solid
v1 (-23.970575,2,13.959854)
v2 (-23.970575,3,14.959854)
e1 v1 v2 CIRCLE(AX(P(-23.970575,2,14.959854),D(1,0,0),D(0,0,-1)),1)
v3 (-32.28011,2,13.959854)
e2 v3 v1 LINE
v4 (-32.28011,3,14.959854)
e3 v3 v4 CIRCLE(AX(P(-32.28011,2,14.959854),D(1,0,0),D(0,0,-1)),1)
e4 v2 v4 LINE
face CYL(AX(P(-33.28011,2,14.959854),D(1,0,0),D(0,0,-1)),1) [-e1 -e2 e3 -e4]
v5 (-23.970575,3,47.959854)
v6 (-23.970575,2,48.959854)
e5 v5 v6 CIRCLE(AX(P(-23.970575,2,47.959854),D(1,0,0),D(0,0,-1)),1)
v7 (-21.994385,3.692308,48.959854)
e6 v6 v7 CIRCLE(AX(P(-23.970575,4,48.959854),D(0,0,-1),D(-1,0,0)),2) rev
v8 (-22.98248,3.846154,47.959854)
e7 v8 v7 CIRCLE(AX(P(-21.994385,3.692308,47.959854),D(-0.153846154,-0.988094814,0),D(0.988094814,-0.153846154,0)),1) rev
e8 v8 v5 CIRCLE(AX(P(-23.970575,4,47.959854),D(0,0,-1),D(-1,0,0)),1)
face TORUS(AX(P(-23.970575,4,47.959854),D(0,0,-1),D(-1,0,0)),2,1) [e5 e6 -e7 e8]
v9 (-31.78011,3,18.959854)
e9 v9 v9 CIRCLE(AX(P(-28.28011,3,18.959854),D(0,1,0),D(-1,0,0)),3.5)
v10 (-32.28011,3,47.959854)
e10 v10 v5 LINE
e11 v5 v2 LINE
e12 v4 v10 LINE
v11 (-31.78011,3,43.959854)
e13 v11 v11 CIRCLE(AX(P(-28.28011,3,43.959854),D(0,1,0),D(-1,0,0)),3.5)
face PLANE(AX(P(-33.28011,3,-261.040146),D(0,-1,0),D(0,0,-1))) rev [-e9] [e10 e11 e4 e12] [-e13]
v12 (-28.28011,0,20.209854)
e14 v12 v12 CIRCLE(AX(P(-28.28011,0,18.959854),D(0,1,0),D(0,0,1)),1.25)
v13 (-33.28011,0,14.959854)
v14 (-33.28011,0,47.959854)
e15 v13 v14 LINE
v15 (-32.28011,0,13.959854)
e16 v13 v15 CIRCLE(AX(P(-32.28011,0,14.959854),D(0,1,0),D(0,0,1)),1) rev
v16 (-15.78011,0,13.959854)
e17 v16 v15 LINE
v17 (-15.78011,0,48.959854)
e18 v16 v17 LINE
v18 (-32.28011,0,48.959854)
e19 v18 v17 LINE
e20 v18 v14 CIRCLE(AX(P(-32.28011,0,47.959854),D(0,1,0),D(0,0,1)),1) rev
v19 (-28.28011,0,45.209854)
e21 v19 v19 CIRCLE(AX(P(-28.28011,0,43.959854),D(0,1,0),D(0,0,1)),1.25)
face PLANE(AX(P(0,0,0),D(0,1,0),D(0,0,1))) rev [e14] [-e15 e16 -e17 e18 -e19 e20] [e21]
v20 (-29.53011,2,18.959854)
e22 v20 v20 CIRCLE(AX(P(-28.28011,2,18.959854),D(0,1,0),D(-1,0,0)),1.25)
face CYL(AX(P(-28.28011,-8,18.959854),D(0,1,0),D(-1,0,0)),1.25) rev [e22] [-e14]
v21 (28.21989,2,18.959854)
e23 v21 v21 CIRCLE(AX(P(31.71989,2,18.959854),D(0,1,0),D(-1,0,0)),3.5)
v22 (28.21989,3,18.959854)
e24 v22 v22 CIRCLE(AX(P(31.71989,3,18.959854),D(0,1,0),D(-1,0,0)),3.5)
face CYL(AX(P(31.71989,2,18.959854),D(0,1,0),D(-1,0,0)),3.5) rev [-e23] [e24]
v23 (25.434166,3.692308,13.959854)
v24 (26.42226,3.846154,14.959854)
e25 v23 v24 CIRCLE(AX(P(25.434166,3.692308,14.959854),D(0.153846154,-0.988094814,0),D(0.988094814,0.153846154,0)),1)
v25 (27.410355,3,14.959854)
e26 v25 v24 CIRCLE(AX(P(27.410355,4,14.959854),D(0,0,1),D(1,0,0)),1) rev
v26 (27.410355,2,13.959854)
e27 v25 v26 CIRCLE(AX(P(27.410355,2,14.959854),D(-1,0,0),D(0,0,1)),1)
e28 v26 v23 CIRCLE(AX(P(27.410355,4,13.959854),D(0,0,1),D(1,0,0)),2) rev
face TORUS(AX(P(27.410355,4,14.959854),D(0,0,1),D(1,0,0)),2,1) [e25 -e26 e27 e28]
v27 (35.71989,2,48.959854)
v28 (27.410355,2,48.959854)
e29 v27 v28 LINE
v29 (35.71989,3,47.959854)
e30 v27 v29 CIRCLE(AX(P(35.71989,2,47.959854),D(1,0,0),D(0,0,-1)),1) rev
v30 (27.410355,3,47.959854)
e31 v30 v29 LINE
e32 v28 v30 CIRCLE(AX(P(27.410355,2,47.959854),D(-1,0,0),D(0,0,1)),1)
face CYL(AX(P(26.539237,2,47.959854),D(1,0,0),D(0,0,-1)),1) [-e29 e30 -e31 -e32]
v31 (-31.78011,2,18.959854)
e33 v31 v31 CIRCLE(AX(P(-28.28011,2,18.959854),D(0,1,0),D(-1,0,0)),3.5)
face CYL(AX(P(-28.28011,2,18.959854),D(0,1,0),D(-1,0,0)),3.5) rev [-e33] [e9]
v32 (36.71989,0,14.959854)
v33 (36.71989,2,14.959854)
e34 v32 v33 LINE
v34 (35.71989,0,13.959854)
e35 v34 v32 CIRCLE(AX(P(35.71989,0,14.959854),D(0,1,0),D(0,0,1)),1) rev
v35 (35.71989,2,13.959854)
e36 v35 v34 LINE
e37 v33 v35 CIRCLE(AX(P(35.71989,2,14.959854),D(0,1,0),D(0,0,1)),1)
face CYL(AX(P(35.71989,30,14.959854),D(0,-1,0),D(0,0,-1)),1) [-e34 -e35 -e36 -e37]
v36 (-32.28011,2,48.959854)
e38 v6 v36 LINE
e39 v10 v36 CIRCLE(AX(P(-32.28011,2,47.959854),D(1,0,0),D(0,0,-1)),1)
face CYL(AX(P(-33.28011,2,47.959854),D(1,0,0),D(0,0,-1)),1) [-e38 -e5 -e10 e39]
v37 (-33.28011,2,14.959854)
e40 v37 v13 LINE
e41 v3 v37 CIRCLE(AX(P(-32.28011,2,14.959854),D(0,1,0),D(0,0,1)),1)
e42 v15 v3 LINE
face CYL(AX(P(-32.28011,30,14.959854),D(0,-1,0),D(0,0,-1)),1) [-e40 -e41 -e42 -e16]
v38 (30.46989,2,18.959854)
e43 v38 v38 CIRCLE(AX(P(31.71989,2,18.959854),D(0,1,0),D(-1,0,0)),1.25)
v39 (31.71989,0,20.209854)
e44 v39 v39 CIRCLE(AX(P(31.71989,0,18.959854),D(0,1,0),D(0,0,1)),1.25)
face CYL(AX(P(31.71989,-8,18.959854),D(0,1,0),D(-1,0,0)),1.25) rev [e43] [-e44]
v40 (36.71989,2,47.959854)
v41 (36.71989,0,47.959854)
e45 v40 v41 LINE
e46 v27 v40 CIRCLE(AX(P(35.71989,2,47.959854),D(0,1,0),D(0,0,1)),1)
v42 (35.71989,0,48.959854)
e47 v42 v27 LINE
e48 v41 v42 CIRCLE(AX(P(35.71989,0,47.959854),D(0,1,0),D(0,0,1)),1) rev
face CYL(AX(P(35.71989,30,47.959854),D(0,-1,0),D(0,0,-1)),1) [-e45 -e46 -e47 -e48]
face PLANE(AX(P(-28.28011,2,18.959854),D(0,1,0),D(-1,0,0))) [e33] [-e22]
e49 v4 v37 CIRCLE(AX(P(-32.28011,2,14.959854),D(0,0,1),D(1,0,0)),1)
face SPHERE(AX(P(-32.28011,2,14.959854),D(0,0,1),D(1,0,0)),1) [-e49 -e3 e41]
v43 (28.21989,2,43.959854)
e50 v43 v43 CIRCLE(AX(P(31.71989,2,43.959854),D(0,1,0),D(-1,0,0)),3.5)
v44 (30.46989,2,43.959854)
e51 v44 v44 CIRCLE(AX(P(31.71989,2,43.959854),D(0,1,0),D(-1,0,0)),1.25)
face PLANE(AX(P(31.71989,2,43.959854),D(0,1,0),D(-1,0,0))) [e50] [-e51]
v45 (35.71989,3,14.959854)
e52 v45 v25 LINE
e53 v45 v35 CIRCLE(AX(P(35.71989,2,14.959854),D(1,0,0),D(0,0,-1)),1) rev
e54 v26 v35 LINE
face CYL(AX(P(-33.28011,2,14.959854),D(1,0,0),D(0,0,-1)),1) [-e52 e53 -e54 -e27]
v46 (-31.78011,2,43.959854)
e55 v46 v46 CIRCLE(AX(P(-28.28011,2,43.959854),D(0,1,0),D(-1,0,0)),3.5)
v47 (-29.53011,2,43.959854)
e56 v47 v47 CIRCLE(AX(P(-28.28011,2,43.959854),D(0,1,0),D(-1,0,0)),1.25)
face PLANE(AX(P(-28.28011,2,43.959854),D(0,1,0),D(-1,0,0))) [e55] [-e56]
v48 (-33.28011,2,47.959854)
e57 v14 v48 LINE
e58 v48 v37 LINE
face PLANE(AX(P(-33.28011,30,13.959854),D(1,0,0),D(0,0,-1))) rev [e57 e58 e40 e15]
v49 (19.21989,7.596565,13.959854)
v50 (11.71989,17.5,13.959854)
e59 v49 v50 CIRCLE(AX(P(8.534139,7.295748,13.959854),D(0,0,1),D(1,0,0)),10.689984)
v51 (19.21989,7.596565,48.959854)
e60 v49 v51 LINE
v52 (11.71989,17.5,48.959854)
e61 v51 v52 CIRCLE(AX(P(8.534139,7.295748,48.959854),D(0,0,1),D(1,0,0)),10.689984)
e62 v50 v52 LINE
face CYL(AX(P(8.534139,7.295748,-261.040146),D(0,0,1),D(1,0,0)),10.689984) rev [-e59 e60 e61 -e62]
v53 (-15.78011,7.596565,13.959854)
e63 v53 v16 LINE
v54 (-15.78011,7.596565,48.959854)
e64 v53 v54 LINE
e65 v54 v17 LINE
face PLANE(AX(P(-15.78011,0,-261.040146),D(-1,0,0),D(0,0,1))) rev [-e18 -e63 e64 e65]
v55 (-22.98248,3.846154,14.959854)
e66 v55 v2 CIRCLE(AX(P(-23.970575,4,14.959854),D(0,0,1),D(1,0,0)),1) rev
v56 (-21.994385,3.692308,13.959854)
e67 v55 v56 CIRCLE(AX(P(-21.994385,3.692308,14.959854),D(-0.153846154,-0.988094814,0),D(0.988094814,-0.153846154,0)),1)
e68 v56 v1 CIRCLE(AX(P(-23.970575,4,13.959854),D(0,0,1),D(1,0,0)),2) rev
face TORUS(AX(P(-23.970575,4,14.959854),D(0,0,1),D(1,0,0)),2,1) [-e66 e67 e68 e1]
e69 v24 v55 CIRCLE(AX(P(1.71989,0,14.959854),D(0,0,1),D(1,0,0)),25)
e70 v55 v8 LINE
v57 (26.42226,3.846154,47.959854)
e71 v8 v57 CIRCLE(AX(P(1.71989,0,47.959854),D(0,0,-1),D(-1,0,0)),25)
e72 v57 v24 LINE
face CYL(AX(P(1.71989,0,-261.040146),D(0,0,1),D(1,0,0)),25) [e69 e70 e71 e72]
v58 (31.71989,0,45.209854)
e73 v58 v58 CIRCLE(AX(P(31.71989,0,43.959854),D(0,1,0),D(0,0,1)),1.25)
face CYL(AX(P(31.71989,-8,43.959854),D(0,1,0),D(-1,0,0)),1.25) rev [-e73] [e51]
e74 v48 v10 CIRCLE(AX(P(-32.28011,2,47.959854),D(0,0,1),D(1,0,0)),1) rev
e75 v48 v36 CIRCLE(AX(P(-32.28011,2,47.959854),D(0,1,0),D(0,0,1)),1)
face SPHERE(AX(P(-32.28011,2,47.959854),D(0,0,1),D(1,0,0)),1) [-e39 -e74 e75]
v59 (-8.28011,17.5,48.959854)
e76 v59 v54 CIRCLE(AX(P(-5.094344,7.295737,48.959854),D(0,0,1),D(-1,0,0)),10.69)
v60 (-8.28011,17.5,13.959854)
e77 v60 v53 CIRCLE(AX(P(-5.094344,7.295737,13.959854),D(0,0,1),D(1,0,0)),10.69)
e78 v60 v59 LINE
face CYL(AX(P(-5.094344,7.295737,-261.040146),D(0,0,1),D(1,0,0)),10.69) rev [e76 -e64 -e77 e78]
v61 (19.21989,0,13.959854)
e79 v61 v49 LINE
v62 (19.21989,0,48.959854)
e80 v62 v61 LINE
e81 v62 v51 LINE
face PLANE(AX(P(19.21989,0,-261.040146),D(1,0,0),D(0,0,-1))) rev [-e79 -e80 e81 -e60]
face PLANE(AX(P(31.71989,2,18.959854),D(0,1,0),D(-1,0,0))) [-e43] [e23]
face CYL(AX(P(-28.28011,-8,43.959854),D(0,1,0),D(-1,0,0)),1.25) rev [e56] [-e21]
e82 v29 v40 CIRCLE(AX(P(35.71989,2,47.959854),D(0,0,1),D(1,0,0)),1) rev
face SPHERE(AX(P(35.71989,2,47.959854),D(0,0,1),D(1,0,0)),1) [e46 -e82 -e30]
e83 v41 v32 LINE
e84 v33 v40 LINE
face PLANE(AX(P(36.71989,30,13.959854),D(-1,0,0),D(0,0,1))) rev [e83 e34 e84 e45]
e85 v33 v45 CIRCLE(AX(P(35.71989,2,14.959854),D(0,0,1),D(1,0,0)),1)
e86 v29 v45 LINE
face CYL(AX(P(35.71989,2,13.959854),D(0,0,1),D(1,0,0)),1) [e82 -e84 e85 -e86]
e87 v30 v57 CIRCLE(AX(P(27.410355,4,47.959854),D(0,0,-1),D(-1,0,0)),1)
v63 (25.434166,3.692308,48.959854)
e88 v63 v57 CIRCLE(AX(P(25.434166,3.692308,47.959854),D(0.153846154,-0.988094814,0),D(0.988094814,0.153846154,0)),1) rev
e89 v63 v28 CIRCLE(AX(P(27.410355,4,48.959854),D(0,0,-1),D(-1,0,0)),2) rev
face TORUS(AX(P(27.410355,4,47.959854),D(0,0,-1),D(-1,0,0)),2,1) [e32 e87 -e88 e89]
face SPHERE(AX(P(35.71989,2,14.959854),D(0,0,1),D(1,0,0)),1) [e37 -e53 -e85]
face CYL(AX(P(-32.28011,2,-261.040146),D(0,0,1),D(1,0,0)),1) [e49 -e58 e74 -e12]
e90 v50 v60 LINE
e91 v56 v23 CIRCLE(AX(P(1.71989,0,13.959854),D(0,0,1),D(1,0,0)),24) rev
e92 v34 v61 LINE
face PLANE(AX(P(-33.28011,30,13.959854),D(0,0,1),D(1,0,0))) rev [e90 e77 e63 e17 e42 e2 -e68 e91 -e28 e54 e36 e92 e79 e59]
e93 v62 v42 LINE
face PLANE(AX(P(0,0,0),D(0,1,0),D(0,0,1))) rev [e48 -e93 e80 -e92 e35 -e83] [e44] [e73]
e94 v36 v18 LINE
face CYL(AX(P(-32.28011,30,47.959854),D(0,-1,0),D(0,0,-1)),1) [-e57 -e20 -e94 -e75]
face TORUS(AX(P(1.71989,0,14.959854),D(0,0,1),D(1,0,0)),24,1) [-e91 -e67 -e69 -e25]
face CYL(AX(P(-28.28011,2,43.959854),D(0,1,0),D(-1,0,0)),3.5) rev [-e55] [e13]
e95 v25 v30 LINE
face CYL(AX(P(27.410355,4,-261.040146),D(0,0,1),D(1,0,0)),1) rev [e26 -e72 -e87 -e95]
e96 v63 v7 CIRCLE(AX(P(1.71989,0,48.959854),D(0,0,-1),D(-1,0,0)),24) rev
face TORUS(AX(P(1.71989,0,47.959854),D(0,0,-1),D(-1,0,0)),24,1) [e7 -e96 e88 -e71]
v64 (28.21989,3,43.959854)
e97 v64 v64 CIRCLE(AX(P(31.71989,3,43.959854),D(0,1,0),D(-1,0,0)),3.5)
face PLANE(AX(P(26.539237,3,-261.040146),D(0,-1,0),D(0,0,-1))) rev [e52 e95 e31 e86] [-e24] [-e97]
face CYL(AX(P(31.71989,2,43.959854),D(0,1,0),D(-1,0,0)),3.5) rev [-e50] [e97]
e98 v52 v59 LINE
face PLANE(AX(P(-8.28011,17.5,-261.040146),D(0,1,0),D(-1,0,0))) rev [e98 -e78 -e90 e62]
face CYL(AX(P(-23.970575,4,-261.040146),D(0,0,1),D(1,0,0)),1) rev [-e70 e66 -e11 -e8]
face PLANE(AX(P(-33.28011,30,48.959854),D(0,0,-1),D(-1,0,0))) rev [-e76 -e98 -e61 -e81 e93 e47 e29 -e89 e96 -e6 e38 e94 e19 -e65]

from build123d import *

# Parameters (mm, degrees)
CROQUIS1_W              = 70
CROQUIS1_H              = 35
SALIENTE_EXTRUIR1_DEPTH = 30
CORTAR_EXTRUIR1_DEPTH   = 310
CORTAR_EXTRUIR2_DEPTH   = 310
CROQUIS4_R              = 3.5
CORTAR_EXTRUIR3_DEPTH   = 1
REDONDEO1_R             = 1
REDONDEO2_R             = 1
CROQUIS5_R              = 1.25
CORTAR_EXTRUIR4_DEPTH   = 10


with BuildPart() as part:
    # Croquis1 → Saliente-Extruir1 (new body)
    with BuildSketch(Plane(origin=(0, 0, 0), x_dir=(1, 0, 0), z_dir=(0, 1, 0))):
        with Locations((1.719890136, -31.459853515)):
            Rectangle(CROQUIS1_W, CROQUIS1_H)
    extrude(amount=SALIENTE_EXTRUIR1_DEPTH)

    # Croquis2 → Cortar-Extruir1 (cut)
    with BuildSketch(Plane.XY.offset(48.959853515)):
        with BuildLine():
            Line((-15.780109864, 0), (-15.780109864, 7.596564782))
            ThreePointArc((-15.780109864, 7.596564782), (-13.616336365, 13.749552304), (-8.280109864, 17.5))
            Line((-8.280109864, 17.5), (11.719890136, 17.5))
            ThreePointArc((11.719890136, 17.5), (17.0561195, 13.749554472), (19.219890136, 7.596564782))
            Line((19.219890136, 7.596564782), (19.219890136, 0))
            ThreePointArc((19.219890136, 0), (1.719890136, -17.5), (-15.780109864, 0))
        make_face()
    extrude(amount=-CORTAR_EXTRUIR1_DEPTH, mode=Mode.SUBTRACT)

    # Croquis3 → Cortar-Extruir2 (cut)
    with BuildSketch(Plane.XY.offset(48.959853515)):
        with BuildLine():
            Line((-33.280109864, 30), (36.719890136, 30))
            Line((36.719890136, 30), (36.719890136, 3))
            Line((36.719890136, 3), (26.539237428, 3))
            ThreePointArc((26.539237428, 3), (1.719890136, 25), (-23.099457156, 3))
            Line((-23.099457156, 3), (-33.280109864, 3))
            Line((-33.280109864, 3), (-33.280109864, 30))
        make_face()
    extrude(amount=-CORTAR_EXTRUIR2_DEPTH, mode=Mode.SUBTRACT)

    # Croquis4 → Cortar-Extruir3 (cut)
    with BuildSketch(Plane(origin=(0, 3, 0), x_dir=(1, 0, 0), z_dir=(0, 1, 0))):
        with Locations(Location((-28.280109864, -18.959853515, 0), (0, 0, 180))):
            Circle(CROQUIS4_R)
        with Locations(Location((-28.280109864, -43.959853515, 0), (0, 0, 180))):
            Circle(CROQUIS4_R)
        with Locations(Location((31.719890136, -18.959853515, 0), (0, 0, 180))):
            Circle(CROQUIS4_R)
        with Locations(Location((31.719890136, -43.959853515, 0), (0, 0, 180))):
            Circle(CROQUIS4_R)
    extrude(amount=-CORTAR_EXTRUIR3_DEPTH, mode=Mode.SUBTRACT)

    # Redondeo1
    redondeo1_edges = [part.edges().sort_by_distance(p)[0] for p in [
        (-28.18978351, 3, 13.959853515),
        (1.719890136, 25, 13.959853515),
        (31.629563782, 3, 13.959853515),
        (36.719890136, 3, 31.459853515),
        (26.539237428, 3, 31.459853515),
        (-23.099457156, 3, 31.459853515),
        (-33.280109864, 3, 31.459853515),
        (-28.18978351, 3, 48.959853515),
        (1.719890136, 25, 48.959853515),
        (31.629563782, 3, 48.959853515),
    ]]
    fillet(redondeo1_edges, radius=REDONDEO1_R)

    # Redondeo2
    # the kernel refuses this fillet: 1 mm, written as the material it takes off along each edge
    with BuildSketch(Plane(origin=(-32.280109864, 2, 14.959853515), x_dir=(-1, 0, 0), z_dir=(0, 0, -1))) as redondeo2_piece_1_section:
        Polygon((0, 0), (REDONDEO2_R, 0), (REDONDEO2_R, REDONDEO2_R), (0, REDONDEO2_R), align=None)
    redondeo2_piece_1 = extrude(amount=REDONDEO2_R, mode=Mode.PRIVATE)
    redondeo2_piece_1 = redondeo2_piece_1 - Plane(origin=(-32.280109864, 2, 14.959853515), x_dir=(0.7071067811865475, -0.7071067811865475, 0), z_dir=(0, 0, -1)) * Sphere(REDONDEO2_R, mode=Mode.PRIVATE)
    add(redondeo2_piece_1, mode=Mode.SUBTRACT)
    with BuildSketch(Plane(origin=(35.719890136, 2, 14.959853515), x_dir=(1, 0, 0), z_dir=(0, 0, -1))) as redondeo2_piece_2_section:
        Polygon((0, 0), (REDONDEO2_R, 0), (REDONDEO2_R, -REDONDEO2_R), (0, -REDONDEO2_R), align=None)
    redondeo2_piece_2 = extrude(amount=REDONDEO2_R, mode=Mode.PRIVATE)
    redondeo2_piece_2 = redondeo2_piece_2 - Plane(origin=(35.719890136, 2, 14.959853515), x_dir=(-0.7071067811865475, -0.7071067811865475, 0), z_dir=(0, 0, -1)) * Sphere(REDONDEO2_R, mode=Mode.PRIVATE)
    add(redondeo2_piece_2, mode=Mode.SUBTRACT)
    with BuildSketch(Plane(origin=(-32.280109864, 2, 47.959853515), x_dir=(0, 0, 1), z_dir=(-1, 0, 0))) as redondeo2_piece_3_section:
        Polygon((0, 0), (REDONDEO2_R, 0), (REDONDEO2_R, REDONDEO2_R), (0, REDONDEO2_R), align=None)
    redondeo2_piece_3 = extrude(amount=REDONDEO2_R, mode=Mode.PRIVATE)
    redondeo2_piece_3 = redondeo2_piece_3 - Plane(origin=(-32.280109864, 2, 47.959853515), x_dir=(0, -0.7071067811865475, -0.7071067811865475), z_dir=(-1, 0, 0)) * Sphere(REDONDEO2_R, mode=Mode.PRIVATE)
    add(redondeo2_piece_3, mode=Mode.SUBTRACT)
    with BuildSketch(Plane(origin=(35.719890136, 2, 47.959853515), x_dir=(0, 0, 1), z_dir=(1, 0, 0))) as redondeo2_piece_4_section:
        Polygon((0, 0), (REDONDEO2_R, 0), (REDONDEO2_R, -REDONDEO2_R), (0, -REDONDEO2_R), align=None)
    redondeo2_piece_4 = extrude(amount=REDONDEO2_R, mode=Mode.PRIVATE)
    redondeo2_piece_4 = redondeo2_piece_4 - Plane(origin=(35.719890136, 2, 47.959853515), x_dir=(0, -0.7071067811865475, -0.7071067811865475), z_dir=(1, 0, 0)) * Sphere(REDONDEO2_R, mode=Mode.PRIVATE)
    add(redondeo2_piece_4, mode=Mode.SUBTRACT)
    with BuildSketch(Plane(origin=(36.719890136, -2.5, 48.959853515), x_dir=(0, 0, -1), z_dir=(0, 1, 0)), Plane(origin=(36.719890136, -2.5, 13.959853515), x_dir=(-1, 0, 0), z_dir=(0, 1, 0))) as redondeo2_piece_5:
        with BuildLine():
            CenterArc((REDONDEO2_R, REDONDEO2_R), REDONDEO2_R, 180, 90)
            Line((0, REDONDEO2_R), (0, 0))
            Line((0, 0), (REDONDEO2_R, 0))
        make_face()
    extrude(amount=4.5, mode=Mode.SUBTRACT)
    with BuildSketch(Plane(origin=(-33.280109864, -2.5, 48.959853515), x_dir=(0, 0, -1), z_dir=(0, 1, 0)), Plane(origin=(-33.280109864, -2.5, 13.959853515), x_dir=(1, 0, 0), z_dir=(0, 1, 0))) as redondeo2_piece_6:
        with BuildLine():
            CenterArc((REDONDEO2_R, -REDONDEO2_R), REDONDEO2_R, 90, 90)
            Line((0, -REDONDEO2_R), (0, 0))
            Line((0, 0), (REDONDEO2_R, 0))
        make_face()
    extrude(amount=4.5, mode=Mode.SUBTRACT)

    # Croquis5 → Cortar-Extruir4 (cut)
    with BuildSketch(Plane(origin=(0, 2, 0), x_dir=(1, 0, 0), z_dir=(0, 1, 0))):
        with Locations(Location((-28.280109864, -18.959853515, 0), (0, 0, 180))):
            Circle(CROQUIS5_R)
        with Locations(Location((31.719890136, -18.959853515, 0), (0, 0, 180))):
            Circle(CROQUIS5_R)
        with Locations(Location((31.719890136, -43.959853515, 0), (0, 0, 180))):
            Circle(CROQUIS5_R)
        with Locations(Location((-28.280109864, -43.959853515, 0), (0, 0, 180))):
            Circle(CROQUIS5_R)
    extrude(amount=-CORTAR_EXTRUIR4_DEPTH, mode=Mode.SUBTRACT)


solid = part.part
